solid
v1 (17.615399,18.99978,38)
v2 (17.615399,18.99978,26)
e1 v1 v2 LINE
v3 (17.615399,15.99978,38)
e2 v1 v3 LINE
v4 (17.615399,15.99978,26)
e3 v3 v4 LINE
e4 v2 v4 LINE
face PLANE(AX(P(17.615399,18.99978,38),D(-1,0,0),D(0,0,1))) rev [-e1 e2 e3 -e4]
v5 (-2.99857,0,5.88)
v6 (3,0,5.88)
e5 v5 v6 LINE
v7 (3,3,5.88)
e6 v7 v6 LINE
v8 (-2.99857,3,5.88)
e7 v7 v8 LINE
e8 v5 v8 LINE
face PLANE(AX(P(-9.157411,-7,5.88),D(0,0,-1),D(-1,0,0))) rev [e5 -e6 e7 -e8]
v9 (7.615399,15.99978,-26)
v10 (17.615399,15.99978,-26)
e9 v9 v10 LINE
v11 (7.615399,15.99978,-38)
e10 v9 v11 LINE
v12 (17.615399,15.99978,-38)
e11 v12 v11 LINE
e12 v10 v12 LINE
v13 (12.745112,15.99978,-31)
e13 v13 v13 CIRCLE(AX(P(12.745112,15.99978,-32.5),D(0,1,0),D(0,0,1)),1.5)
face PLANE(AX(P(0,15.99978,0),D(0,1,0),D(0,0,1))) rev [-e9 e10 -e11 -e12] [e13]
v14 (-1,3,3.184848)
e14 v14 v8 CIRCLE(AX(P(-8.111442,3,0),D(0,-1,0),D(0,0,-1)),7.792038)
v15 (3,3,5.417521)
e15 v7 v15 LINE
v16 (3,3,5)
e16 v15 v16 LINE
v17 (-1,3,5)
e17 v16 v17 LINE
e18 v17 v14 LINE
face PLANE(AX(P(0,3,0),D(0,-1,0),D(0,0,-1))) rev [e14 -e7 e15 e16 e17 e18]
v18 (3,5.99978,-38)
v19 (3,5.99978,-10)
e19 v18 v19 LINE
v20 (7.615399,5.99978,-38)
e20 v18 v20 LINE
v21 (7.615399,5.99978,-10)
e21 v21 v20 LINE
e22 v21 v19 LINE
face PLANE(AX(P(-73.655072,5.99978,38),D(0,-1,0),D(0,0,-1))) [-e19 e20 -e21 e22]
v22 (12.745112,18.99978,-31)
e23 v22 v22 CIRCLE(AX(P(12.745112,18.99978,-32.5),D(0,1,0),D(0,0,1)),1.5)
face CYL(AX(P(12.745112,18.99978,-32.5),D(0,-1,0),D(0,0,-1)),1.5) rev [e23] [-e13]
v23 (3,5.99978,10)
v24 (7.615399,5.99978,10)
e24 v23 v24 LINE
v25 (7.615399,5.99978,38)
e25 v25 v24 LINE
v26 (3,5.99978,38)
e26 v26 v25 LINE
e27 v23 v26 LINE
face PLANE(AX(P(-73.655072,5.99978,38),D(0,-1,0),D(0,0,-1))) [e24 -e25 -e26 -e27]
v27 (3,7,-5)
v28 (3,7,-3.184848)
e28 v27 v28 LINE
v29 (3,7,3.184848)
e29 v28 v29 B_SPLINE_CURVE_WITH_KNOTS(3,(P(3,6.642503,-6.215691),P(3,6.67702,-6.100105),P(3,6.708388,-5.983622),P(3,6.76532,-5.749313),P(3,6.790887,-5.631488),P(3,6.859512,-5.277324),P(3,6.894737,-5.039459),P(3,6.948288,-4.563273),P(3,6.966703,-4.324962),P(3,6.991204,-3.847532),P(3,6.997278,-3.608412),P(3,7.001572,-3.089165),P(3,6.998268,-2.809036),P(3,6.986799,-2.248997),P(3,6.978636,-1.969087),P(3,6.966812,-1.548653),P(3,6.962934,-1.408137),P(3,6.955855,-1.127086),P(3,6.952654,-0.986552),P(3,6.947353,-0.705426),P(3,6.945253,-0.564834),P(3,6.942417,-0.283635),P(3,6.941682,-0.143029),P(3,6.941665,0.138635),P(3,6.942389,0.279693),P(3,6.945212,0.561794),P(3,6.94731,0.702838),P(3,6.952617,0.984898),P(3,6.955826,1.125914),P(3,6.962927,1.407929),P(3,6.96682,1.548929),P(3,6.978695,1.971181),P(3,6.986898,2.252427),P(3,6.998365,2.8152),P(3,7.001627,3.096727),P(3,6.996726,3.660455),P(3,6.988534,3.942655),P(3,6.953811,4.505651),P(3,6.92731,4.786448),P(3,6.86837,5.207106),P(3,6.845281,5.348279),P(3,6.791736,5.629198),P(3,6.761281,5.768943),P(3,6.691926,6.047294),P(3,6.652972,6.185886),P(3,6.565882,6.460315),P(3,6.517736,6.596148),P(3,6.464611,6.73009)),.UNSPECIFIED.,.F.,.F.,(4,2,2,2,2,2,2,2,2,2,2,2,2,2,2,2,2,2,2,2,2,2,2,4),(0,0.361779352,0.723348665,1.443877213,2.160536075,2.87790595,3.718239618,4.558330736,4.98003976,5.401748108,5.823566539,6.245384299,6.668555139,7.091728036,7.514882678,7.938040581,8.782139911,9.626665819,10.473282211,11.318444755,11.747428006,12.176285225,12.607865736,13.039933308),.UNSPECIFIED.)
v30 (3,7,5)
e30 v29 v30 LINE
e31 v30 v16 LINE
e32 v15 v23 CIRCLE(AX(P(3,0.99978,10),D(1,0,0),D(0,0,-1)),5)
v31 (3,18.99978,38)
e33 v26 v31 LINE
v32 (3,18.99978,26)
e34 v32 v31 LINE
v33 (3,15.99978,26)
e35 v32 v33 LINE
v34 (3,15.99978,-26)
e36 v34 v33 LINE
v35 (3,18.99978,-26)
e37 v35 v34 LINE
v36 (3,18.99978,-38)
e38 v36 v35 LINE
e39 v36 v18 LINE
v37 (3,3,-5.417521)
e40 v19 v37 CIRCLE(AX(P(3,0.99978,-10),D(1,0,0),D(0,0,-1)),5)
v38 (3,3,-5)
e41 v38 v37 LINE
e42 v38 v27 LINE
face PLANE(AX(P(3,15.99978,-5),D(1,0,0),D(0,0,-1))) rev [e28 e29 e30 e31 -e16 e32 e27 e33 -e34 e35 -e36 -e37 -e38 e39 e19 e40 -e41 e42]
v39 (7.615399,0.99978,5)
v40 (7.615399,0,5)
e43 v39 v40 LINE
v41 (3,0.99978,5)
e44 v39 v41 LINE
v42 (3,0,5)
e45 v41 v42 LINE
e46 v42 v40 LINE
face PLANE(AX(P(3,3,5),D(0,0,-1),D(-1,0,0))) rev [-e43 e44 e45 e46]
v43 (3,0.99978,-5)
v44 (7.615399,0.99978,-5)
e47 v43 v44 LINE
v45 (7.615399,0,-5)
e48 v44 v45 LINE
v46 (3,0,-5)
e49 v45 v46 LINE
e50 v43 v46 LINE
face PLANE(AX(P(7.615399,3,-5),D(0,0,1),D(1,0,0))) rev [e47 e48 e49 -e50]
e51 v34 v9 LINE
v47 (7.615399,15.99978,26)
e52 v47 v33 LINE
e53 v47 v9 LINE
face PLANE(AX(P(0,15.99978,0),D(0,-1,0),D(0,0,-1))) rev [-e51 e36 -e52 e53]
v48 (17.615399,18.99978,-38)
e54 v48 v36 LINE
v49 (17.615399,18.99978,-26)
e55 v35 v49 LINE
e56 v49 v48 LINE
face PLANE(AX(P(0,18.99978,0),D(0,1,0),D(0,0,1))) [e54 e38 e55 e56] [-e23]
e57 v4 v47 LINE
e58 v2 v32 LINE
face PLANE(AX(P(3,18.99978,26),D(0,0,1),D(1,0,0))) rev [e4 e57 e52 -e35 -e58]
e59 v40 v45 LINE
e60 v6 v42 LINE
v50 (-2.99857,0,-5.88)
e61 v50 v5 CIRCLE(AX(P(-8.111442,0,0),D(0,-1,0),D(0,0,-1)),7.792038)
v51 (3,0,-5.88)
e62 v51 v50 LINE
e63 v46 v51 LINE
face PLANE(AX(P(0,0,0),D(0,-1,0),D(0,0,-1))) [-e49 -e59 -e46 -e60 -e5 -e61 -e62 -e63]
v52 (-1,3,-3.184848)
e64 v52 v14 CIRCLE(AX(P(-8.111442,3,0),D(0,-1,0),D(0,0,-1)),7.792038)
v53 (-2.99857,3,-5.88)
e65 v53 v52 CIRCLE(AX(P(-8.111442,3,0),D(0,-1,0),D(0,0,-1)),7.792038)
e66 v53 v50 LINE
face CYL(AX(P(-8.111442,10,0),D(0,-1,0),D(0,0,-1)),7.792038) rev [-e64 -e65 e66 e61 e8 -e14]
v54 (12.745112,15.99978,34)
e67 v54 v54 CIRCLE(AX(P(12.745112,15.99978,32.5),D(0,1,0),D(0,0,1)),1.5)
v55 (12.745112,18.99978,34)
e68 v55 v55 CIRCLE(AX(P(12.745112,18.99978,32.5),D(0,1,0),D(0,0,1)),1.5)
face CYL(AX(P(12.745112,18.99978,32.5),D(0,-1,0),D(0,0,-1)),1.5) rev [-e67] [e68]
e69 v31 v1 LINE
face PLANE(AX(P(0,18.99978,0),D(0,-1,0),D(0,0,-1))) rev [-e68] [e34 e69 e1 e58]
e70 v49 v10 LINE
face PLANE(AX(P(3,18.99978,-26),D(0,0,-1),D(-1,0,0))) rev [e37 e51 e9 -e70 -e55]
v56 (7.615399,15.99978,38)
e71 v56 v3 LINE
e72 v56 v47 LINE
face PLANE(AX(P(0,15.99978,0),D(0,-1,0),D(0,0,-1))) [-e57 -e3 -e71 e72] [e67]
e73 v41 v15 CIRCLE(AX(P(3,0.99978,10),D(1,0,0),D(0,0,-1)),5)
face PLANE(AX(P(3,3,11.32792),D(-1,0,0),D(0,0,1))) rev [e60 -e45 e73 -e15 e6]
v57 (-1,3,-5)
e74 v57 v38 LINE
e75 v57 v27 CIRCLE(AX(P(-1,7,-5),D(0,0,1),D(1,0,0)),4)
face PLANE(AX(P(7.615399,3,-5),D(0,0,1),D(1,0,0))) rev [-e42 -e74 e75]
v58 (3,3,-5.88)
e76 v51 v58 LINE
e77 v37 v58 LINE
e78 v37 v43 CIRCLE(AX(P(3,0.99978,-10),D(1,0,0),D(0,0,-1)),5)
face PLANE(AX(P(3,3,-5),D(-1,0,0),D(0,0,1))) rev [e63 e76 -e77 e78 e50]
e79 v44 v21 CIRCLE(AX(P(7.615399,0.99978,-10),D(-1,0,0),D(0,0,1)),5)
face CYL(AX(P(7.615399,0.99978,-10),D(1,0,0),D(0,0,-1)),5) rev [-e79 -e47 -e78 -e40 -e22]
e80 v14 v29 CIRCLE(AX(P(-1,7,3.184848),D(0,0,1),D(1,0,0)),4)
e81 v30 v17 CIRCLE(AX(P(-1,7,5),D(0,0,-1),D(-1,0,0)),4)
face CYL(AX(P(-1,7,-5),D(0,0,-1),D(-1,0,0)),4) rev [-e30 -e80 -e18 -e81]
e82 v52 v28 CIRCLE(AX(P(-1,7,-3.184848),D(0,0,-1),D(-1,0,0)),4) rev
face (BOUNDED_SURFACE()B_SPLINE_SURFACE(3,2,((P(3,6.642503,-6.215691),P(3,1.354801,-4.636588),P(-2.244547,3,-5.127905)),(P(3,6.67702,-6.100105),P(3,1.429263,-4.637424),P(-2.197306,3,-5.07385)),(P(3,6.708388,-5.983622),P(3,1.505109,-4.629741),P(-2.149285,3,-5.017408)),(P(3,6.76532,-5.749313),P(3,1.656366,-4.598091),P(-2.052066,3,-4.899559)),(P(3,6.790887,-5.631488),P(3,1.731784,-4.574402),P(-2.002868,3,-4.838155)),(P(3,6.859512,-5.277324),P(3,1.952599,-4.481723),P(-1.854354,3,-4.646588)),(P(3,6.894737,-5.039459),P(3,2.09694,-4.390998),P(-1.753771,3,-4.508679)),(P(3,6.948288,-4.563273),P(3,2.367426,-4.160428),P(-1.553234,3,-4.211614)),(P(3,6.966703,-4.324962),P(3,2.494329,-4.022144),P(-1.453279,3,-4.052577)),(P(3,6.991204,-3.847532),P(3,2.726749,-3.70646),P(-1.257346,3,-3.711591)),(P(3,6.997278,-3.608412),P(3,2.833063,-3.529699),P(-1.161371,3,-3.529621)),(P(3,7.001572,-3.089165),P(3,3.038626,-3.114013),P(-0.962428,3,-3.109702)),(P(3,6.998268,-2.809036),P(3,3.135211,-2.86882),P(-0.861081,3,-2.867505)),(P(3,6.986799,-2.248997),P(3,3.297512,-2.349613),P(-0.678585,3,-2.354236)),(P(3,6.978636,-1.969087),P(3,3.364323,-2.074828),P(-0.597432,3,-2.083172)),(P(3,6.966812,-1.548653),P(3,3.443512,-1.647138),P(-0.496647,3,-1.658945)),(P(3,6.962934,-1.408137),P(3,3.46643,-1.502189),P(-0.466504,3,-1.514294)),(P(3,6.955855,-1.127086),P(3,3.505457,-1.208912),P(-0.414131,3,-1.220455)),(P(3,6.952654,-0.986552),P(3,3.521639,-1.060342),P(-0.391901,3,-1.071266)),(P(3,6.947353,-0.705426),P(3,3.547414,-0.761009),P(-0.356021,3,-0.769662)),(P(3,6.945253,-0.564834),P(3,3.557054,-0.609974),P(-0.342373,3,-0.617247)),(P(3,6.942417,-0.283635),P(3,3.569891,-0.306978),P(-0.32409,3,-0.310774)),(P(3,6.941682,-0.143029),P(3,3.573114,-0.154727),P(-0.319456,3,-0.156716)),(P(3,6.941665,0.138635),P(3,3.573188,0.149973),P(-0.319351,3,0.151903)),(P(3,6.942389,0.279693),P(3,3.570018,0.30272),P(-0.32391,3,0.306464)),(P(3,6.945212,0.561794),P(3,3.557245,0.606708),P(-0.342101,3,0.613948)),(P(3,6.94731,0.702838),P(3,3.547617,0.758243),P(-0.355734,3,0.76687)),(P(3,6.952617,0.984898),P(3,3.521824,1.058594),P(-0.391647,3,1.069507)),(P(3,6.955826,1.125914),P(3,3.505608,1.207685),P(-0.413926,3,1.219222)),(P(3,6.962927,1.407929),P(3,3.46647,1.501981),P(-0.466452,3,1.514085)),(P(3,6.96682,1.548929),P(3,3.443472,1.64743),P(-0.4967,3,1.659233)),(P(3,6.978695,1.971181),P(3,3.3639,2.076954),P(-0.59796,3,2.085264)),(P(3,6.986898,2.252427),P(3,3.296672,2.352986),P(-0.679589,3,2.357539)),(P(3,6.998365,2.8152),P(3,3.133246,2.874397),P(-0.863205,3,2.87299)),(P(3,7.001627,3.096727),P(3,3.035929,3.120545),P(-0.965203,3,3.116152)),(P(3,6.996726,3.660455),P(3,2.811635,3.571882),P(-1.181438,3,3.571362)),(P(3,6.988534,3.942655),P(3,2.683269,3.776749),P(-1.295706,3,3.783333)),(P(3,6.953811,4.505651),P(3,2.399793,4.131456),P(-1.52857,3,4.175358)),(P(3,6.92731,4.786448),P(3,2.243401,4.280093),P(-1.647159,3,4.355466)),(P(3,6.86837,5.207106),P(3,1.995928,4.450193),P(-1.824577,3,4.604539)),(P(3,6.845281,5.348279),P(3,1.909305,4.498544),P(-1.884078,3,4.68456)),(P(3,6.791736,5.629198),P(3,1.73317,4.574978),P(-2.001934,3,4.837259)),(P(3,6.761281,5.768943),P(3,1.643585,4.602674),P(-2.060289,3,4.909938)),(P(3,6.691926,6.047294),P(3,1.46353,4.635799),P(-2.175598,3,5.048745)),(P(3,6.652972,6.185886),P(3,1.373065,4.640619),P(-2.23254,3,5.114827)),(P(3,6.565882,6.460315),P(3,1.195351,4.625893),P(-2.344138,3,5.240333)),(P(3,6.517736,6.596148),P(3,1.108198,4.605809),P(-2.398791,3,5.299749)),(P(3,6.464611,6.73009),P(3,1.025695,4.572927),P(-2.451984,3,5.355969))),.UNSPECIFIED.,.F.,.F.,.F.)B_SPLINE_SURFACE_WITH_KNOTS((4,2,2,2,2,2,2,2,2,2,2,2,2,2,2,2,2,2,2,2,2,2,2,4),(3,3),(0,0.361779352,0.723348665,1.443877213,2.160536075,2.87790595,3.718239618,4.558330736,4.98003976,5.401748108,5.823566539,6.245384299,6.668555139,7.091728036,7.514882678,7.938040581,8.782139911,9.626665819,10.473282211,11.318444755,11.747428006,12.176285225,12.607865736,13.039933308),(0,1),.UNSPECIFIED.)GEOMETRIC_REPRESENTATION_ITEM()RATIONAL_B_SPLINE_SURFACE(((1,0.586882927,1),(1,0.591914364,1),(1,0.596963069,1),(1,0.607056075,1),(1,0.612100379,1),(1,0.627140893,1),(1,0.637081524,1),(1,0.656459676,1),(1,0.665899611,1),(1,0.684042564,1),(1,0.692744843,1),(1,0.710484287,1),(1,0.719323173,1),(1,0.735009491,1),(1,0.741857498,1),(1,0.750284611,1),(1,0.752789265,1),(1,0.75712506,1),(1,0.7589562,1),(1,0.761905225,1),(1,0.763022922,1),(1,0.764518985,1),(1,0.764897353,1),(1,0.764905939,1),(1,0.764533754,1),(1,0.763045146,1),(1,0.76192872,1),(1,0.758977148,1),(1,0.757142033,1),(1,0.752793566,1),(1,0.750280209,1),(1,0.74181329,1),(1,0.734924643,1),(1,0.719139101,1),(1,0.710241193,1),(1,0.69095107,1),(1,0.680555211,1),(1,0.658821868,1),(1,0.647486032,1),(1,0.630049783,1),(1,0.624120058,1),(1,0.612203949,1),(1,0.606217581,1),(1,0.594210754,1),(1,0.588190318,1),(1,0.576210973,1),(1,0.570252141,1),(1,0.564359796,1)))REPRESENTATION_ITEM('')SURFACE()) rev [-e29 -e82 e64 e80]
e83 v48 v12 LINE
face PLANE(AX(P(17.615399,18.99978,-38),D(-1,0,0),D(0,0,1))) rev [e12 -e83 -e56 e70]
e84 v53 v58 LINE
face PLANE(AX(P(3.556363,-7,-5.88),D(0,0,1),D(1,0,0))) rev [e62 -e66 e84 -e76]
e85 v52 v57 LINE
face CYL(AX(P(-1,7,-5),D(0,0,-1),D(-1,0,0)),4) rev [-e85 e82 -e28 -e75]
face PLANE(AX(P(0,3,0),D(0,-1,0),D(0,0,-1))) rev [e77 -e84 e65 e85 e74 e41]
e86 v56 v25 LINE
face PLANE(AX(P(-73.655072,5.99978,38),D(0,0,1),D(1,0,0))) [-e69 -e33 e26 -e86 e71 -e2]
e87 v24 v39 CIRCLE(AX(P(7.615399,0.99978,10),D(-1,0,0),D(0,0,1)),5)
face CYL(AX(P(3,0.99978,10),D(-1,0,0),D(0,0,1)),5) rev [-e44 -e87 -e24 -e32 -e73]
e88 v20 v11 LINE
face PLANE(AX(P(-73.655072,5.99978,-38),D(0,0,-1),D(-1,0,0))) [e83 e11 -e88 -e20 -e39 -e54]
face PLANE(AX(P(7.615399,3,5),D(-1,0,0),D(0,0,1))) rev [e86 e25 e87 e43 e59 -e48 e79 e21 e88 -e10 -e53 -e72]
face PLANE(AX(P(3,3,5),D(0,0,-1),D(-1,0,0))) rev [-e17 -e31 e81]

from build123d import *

# Parameters (mm, degrees)
SKETCH1_R           = 1.5
BOSS_EXTRUDE1_DEPTH = 3
SKETCH3_W           = 4.615398666
SKETCH3_H           = 10
BOSS_EXTRUDE2_DEPTH = 12.9997796
FILLET7_R           = 1
CUT_EXTRUDE4_DEPTH  = 10
FILLET8_R           = 4
SKETCH8_W           = 76
SKETCH8_H           = 10
BOSS_EXTRUDE3_DEPTH = 4.615398666
SKETCH9_W           = 14.615398666
SKETCH9_H           = 12
SKETCH9_R           = 1.5
BOSS_EXTRUDE4_DEPTH = 3
FILLET9_R           = 5
FILLET10_R          = 5
SKETCH10_W          = 9.773230982
SKETCH10_H          = 9.985016007
SKETCH10_W_2        = 12.713773796
SKETCH10_H_2        = 7.76031956
CUT_EXTRUDE6_DEPTH  = 10


with BuildPart() as part:
    # Sketch1 → Boss-Extrude1 (new body)
    with BuildSketch(Plane(origin=(0, 0, 0), x_dir=(1, 0, 0), z_dir=(0, 1, 0))):
        Polygon((-3, -11.32792047), (3, -11.32792047), (3, -5), (7.615398666, -5), (7.615398666, 5), (3, 5), (3, 11.32792047), (-3, 11.32792047), align=None)
        with Locations(Location((0, 8.5, 0), (0, 0, 270))):
            Circle(SKETCH1_R, mode=Mode.SUBTRACT)
        with Locations(Location((0, -8.5, 0), (0, 0, 270))):
            Circle(SKETCH1_R, mode=Mode.SUBTRACT)
    extrude(amount=BOSS_EXTRUDE1_DEPTH)

    # Sketch3 → Boss-Extrude2 (add)
    with BuildSketch(Plane(origin=(0, 3, 0), x_dir=(1, 0, 0), z_dir=(0, 1, 0))):
        with Locations((5.307699333, 0)):
            Rectangle(SKETCH3_W, SKETCH3_H)
    extrude(amount=BOSS_EXTRUDE2_DEPTH)

    # Fillet7
    fillet7_edges = [part.edges().sort_by_distance(p)[0] for p in [
        (3, 1.5, 11.32792047),
        (3, 1.5, -11.32792047),
    ]]
    fillet(fillet7_edges, radius=FILLET7_R)

    # Sketch7 → Cut-Extrude4 (cut)
    with BuildSketch(Plane.XZ):
        with BuildLine():
            Line((-3.65526474, -6.392053518), (-3.78188192, 6.478485425))
            ThreePointArc((-3.78188192, 6.478485425), (-0.319780446, 0.076652438), (-3.65526474, -6.392053518))
        make_face()
    extrude(amount=-CUT_EXTRUDE4_DEPTH, mode=Mode.SUBTRACT)

    # Fillet8
    fillet8_edges = [part.edges().sort_by_distance(p)[0] for p in [
        (3, 3, 0),
    ]]
    fillet(fillet8_edges, radius=FILLET8_R)

    # Sketch8 → Boss-Extrude3 (add)
    with BuildSketch(Plane(origin=(7.615398666, 0, 0), x_dir=(0, 0, -1), z_dir=(1, 0, 0))):
        with Locations((0, 10.9997796)):
            Rectangle(SKETCH8_W, SKETCH8_H)
    extrude(amount=-BOSS_EXTRUDE3_DEPTH)

    # Sketch9 → Boss-Extrude4 (add)
    # profile 1 of 2: a face of its own
    with BuildSketch(Plane(origin=(0, 15.9997796, 0), x_dir=(1, 0, 0), z_dir=(0, 1, 0))):
        with Locations((10.307699333, 32)):
            Rectangle(SKETCH9_W, SKETCH9_H)
        with Locations(Location((12.745112207, 32.5, 0), (0, 0, 270))):
            Circle(SKETCH9_R, mode=Mode.SUBTRACT)
    # profile 2 of 2: a face of its own
    with BuildSketch(Plane(origin=(0, 15.9997796, 0), x_dir=(1, 0, 0), z_dir=(0, 1, 0))):
        with Locations((10.307699333, -32)):
            Rectangle(SKETCH9_W, SKETCH9_H)
        with Locations(Location((12.745112207, -32.5, 0), (0, 0, 270))):
            Circle(SKETCH9_R, mode=Mode.SUBTRACT)
    extrude(amount=BOSS_EXTRUDE4_DEPTH)

    # Fillet9
    # the kernel refuses this fillet: 5 mm, written as the material it adds along each edge
    with BuildSketch(Plane(origin=(7.615398666, 5.9997796, 5), x_dir=(0, -1, 0), z_dir=(-1, 0, 0))) as fillet9_piece_1:
        with BuildLine():
            CenterArc((FILLET9_R, FILLET9_R), FILLET9_R, 180, 90)
            Line((0, FILLET9_R), (0, 0))
            Line((0, 0), (FILLET9_R, 0))
        make_face()
    extrude(amount=4.615398666)

    # Fillet10
    # the kernel refuses this fillet: 5 mm, written as the material it adds along each edge
    with BuildSketch(Plane(origin=(3, 5.9997796, -5), x_dir=(0, -1, 0), z_dir=(1, 0, 0))) as fillet10_piece_1:
        with BuildLine():
            CenterArc((FILLET10_R, FILLET10_R), FILLET10_R, 180, 90)
            Line((0, FILLET10_R), (0, 0))
            Line((0, 0), (FILLET10_R, 0))
        make_face()
    extrude(amount=4.615398666)

    # Sketch10 → Cut-Extrude6 (cut)
    with BuildSketch(Plane(origin=(0, 3, 0), x_dir=(1, 0, 0), z_dir=(0, 1, 0))):
        with Locations((-1.330252474, 10.872508004)):
            Rectangle(SKETCH10_W, SKETCH10_H)
        with Locations((-2.800523881, -9.76015978)):
            Rectangle(SKETCH10_W_2, SKETCH10_H_2)
    extrude(amount=-CUT_EXTRUDE6_DEPTH, mode=Mode.SUBTRACT)


solid = part.part
